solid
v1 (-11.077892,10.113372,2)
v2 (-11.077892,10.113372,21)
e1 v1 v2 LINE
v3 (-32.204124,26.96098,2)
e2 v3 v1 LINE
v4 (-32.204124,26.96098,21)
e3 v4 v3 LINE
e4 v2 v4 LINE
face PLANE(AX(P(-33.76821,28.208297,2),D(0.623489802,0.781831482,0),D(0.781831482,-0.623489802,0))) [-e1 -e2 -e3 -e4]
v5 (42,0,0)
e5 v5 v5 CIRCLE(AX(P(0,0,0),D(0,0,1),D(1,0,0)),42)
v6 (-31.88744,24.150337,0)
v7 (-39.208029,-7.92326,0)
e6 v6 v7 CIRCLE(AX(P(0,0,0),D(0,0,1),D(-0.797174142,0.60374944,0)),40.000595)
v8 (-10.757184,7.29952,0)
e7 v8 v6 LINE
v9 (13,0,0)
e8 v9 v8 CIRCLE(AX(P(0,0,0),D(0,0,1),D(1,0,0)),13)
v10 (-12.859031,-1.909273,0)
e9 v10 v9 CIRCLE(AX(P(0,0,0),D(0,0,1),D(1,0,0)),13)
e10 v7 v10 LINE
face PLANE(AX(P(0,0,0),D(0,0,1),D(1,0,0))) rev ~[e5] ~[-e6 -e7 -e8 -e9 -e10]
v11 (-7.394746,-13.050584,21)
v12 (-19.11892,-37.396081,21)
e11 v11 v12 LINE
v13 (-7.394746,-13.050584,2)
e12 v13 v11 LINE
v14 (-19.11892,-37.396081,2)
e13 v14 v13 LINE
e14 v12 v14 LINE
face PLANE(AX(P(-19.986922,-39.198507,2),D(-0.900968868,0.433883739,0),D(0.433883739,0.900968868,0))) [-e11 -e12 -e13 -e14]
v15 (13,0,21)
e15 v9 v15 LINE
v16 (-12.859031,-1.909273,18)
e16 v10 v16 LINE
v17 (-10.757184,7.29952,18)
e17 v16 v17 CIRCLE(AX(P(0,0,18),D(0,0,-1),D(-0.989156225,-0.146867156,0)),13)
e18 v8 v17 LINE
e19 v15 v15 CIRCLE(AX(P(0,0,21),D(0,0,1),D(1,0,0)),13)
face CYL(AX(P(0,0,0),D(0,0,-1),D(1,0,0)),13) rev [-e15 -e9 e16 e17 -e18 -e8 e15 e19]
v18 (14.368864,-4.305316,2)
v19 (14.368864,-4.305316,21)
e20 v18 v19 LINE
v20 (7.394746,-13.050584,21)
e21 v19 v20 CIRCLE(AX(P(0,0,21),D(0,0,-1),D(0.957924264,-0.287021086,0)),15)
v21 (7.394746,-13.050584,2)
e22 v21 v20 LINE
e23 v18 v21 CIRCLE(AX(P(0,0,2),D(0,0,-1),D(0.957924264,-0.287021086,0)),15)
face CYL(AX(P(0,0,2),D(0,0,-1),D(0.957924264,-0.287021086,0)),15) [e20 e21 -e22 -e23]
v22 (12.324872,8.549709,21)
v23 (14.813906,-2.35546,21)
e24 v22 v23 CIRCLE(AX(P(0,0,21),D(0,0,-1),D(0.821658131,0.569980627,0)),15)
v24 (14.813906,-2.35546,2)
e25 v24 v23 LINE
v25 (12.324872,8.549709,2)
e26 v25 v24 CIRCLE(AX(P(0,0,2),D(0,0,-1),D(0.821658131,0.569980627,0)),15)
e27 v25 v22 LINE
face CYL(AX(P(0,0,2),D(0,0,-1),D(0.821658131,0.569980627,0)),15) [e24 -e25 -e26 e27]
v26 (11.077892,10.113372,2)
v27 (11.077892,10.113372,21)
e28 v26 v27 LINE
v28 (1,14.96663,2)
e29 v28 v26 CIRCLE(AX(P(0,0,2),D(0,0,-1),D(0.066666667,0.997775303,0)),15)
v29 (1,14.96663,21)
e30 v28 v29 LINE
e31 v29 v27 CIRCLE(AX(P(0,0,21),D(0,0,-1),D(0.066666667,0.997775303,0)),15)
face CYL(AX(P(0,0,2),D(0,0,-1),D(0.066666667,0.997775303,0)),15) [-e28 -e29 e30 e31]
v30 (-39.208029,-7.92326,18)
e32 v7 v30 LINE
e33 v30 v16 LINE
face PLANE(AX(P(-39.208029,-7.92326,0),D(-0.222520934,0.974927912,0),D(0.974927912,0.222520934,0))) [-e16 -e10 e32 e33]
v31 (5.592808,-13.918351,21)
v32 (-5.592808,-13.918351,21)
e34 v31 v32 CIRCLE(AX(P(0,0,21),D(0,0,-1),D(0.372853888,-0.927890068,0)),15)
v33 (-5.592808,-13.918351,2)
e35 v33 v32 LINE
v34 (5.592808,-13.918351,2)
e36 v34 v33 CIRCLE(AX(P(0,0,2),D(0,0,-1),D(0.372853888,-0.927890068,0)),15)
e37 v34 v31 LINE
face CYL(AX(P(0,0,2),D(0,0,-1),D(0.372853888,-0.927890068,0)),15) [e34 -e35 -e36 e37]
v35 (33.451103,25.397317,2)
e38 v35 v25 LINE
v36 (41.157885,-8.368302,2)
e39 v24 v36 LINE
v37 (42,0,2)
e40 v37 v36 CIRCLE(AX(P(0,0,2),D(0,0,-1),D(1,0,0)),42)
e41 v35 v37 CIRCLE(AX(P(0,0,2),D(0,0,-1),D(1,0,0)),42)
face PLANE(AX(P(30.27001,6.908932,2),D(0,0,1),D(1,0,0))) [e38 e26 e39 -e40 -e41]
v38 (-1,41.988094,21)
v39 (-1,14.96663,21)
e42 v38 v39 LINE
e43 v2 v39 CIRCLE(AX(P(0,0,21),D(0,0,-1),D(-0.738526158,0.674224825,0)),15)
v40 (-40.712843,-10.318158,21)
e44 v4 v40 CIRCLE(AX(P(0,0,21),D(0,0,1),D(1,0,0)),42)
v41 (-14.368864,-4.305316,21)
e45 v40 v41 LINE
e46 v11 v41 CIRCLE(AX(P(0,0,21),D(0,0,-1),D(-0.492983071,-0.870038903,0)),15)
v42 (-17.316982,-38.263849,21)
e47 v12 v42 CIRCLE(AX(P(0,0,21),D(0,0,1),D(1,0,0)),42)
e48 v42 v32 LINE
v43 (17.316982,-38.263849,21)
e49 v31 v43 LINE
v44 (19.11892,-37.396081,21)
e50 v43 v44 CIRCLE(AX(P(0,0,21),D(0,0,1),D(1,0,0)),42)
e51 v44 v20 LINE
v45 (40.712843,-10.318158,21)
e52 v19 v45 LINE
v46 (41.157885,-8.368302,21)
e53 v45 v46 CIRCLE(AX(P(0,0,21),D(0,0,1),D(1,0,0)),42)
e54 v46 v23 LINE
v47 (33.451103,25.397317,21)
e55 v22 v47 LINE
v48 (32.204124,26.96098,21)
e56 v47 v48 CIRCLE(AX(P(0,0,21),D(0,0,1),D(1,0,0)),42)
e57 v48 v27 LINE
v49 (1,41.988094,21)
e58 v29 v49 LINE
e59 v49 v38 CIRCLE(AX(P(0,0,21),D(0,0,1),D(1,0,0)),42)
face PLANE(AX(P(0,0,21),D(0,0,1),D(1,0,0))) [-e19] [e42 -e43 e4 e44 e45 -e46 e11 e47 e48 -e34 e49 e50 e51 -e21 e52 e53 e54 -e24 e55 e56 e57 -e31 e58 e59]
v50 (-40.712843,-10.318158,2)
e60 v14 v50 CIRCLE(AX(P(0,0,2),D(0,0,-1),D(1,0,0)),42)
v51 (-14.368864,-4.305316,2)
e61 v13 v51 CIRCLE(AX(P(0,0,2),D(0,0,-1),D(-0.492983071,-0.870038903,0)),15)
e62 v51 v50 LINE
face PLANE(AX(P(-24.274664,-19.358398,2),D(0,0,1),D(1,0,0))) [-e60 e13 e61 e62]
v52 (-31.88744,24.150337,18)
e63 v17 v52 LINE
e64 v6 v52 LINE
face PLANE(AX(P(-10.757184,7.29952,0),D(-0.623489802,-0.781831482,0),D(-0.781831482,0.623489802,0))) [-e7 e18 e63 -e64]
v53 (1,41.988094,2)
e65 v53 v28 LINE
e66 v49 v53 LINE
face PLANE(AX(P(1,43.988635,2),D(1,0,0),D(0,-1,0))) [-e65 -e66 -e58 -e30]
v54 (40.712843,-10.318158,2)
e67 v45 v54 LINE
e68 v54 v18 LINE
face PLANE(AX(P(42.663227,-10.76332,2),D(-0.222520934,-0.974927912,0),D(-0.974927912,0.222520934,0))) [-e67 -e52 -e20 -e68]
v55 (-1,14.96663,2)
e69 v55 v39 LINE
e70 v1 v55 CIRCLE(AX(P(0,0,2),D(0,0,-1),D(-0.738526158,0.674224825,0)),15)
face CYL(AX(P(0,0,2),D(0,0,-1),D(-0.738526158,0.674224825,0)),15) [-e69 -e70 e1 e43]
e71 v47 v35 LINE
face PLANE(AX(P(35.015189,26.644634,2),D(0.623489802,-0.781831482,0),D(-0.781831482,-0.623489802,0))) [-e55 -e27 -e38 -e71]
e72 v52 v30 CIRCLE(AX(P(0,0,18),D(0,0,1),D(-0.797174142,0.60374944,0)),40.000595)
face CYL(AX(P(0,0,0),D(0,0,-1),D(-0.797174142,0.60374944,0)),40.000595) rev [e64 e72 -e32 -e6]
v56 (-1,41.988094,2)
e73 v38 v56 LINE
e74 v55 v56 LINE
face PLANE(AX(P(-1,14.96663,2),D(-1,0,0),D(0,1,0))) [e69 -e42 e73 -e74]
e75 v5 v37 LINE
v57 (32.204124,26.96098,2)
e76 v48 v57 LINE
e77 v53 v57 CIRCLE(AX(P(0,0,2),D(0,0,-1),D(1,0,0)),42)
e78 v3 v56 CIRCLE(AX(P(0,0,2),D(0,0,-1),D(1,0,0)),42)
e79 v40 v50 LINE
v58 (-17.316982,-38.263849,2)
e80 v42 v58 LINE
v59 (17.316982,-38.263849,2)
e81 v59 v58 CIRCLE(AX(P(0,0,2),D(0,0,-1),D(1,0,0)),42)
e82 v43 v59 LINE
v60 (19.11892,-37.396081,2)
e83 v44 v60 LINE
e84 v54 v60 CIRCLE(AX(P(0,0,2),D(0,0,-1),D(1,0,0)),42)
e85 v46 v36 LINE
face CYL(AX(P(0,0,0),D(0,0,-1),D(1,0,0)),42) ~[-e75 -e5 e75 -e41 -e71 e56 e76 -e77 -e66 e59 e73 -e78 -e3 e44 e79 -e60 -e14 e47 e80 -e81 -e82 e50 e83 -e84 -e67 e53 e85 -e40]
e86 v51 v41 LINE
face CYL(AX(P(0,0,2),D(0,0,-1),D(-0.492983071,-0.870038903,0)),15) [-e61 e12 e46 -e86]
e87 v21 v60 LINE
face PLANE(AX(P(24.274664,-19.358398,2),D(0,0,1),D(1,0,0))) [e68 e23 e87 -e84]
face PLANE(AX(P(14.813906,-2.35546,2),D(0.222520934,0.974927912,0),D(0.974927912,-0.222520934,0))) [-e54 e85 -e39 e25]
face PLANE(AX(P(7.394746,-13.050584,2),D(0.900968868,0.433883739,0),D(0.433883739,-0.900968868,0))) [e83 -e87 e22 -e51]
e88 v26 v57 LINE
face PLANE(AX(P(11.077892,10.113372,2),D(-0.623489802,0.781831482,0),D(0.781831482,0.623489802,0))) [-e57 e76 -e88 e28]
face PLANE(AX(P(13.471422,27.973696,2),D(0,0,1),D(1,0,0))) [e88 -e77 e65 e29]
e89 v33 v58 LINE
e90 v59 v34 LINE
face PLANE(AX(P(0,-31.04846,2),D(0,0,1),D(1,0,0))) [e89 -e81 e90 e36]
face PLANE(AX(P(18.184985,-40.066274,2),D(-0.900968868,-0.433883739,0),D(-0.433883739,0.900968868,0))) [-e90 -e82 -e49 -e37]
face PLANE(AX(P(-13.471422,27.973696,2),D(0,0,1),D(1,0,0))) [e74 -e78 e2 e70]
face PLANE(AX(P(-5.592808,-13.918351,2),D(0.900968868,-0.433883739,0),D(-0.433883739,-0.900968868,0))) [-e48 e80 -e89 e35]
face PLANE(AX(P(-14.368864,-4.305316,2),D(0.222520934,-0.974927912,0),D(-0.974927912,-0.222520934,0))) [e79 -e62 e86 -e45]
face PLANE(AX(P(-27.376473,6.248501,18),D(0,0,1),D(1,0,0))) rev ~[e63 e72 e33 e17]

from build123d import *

# Parameters (mm, degrees)
F0_R     = 42
F0_R_2   = 13
F3_DEPTH = 21
F4_DEPTH = 25
F9_DEPTH = 18


# Not quite as in the source:
# - a feature names something its author has since deleted; it is built from what else it names


with BuildPart() as f3:
    # F0 (on Top) → F3 (new body)
    with BuildSketch(Plane.XY):
        Circle(F0_R)
        Circle(F0_R_2, mode=Mode.SUBTRACT)
    extrude(amount=F3_DEPTH)

    # F2 (on offset) → F4 (cut)
    with BuildSketch(Plane.XY.offset(2)):
        with BuildLine():
            Line((1, 43.9886348958), (1, 14.9666295471))
            ThreePointArc((1, 14.9666295471), (6.5082560868, 13.5145330185), (11.0778923645, 10.1133723733))
            Line((11.0778923645, 10.1133723733), (33.7682098305, 28.2082967377))
            ThreePointArc((33.7682098305, 28.2082967377), (19.0908845212, 39.6426301877), (1, 43.9886348958))
        make_face()
        with BuildLine():
            ThreePointArc((-11.0778923645, 10.1133723733), (-6.5082560868, 13.5145330185), (-1, 14.9666295471))
            Line((-1, 14.9666295471), (-1, 43.9886348958))
            ThreePointArc((-1, 43.9886348958), (-19.0908845212, 39.6426301877), (-33.7682098305, 28.2082967377))
            Line((-33.7682098305, 28.2082967377), (-11.0778923645, 10.1133723733))
        make_face()
        with BuildLine():
            ThreePointArc((-7.3947460578, -13.0505835402), (-11.727472237, -9.3523470279), (-14.3688639628, -4.3053162972))
            Line((-14.3688639628, -4.3053162972), (-42.6632270448, -10.7633200327))
            ThreePointArc((-42.6632270448, -10.7633200327), (-34.4005852286, -27.4335512818), (-19.9869222552, -39.1985068436))
            Line((-19.9869222552, -39.1985068436), (-7.3947460578, -13.0505835402))
        make_face()
        with BuildLine():
            ThreePointArc((5.592808322, -13.9183510185), (0, -15), (-5.592808322, -13.9183510185))
            Line((-5.592808322, -13.9183510185), (-18.1849845194, -40.0662743218))
            ThreePointArc((-18.1849845194, -40.0662743218), (0, -44), (18.1849845194, -40.0662743218))
            Line((18.1849845194, -40.0662743218), (5.592808322, -13.9183510185))
        make_face()
        with BuildLine():
            ThreePointArc((14.3688639628, -4.3053162972), (11.727472237, -9.3523470279), (7.3947460578, -13.0505835402))
            Line((7.3947460578, -13.0505835402), (19.9869222552, -39.1985068436))
            ThreePointArc((19.9869222552, -39.1985068436), (34.4005852286, -27.4335512818), (42.6632270448, -10.7633200327))
            Line((42.6632270448, -10.7633200327), (14.3688639628, -4.3053162972))
        make_face()
        with BuildLine():
            ThreePointArc((12.3248719682, 8.5497094083), (14.6239186827, 3.3378140093), (14.8139058307, -2.3554604728))
            Line((14.8139058307, -2.3554604728), (43.1082689127, -8.8134642083))
            ThreePointArc((43.1082689127, -8.8134642083), (42.896828136, 9.7909210941), (35.0151894342, 26.6446337728))
            Line((35.0151894342, 26.6446337728), (12.3248719682, 8.5497094083))
        make_face()
    extrude(amount=F4_DEPTH, mode=Mode.SUBTRACT)

    # F8 (on offset) → F9 (cut)
    with BuildSketch(Plane.XY):
        with BuildLine():
            Line((-39.2080294912, -7.9232600118), (-12.8590309309, -1.9092730337))
            ThreePointArc((-12.8590309309, -1.9092730337), (-12.6740628584, 2.8927721414), (-10.7571840173, 7.2995199854))
            Line((-10.7571840173, 7.2995199854), (-31.8874402635, 24.150337042))
            ThreePointArc((-31.8874402635, 24.150337042), (-38.9976968795, 8.900969829), (-39.2080294912, -7.9232600118))
        make_face()
    extrude(amount=F9_DEPTH, mode=Mode.SUBTRACT)


solid = f3.part
